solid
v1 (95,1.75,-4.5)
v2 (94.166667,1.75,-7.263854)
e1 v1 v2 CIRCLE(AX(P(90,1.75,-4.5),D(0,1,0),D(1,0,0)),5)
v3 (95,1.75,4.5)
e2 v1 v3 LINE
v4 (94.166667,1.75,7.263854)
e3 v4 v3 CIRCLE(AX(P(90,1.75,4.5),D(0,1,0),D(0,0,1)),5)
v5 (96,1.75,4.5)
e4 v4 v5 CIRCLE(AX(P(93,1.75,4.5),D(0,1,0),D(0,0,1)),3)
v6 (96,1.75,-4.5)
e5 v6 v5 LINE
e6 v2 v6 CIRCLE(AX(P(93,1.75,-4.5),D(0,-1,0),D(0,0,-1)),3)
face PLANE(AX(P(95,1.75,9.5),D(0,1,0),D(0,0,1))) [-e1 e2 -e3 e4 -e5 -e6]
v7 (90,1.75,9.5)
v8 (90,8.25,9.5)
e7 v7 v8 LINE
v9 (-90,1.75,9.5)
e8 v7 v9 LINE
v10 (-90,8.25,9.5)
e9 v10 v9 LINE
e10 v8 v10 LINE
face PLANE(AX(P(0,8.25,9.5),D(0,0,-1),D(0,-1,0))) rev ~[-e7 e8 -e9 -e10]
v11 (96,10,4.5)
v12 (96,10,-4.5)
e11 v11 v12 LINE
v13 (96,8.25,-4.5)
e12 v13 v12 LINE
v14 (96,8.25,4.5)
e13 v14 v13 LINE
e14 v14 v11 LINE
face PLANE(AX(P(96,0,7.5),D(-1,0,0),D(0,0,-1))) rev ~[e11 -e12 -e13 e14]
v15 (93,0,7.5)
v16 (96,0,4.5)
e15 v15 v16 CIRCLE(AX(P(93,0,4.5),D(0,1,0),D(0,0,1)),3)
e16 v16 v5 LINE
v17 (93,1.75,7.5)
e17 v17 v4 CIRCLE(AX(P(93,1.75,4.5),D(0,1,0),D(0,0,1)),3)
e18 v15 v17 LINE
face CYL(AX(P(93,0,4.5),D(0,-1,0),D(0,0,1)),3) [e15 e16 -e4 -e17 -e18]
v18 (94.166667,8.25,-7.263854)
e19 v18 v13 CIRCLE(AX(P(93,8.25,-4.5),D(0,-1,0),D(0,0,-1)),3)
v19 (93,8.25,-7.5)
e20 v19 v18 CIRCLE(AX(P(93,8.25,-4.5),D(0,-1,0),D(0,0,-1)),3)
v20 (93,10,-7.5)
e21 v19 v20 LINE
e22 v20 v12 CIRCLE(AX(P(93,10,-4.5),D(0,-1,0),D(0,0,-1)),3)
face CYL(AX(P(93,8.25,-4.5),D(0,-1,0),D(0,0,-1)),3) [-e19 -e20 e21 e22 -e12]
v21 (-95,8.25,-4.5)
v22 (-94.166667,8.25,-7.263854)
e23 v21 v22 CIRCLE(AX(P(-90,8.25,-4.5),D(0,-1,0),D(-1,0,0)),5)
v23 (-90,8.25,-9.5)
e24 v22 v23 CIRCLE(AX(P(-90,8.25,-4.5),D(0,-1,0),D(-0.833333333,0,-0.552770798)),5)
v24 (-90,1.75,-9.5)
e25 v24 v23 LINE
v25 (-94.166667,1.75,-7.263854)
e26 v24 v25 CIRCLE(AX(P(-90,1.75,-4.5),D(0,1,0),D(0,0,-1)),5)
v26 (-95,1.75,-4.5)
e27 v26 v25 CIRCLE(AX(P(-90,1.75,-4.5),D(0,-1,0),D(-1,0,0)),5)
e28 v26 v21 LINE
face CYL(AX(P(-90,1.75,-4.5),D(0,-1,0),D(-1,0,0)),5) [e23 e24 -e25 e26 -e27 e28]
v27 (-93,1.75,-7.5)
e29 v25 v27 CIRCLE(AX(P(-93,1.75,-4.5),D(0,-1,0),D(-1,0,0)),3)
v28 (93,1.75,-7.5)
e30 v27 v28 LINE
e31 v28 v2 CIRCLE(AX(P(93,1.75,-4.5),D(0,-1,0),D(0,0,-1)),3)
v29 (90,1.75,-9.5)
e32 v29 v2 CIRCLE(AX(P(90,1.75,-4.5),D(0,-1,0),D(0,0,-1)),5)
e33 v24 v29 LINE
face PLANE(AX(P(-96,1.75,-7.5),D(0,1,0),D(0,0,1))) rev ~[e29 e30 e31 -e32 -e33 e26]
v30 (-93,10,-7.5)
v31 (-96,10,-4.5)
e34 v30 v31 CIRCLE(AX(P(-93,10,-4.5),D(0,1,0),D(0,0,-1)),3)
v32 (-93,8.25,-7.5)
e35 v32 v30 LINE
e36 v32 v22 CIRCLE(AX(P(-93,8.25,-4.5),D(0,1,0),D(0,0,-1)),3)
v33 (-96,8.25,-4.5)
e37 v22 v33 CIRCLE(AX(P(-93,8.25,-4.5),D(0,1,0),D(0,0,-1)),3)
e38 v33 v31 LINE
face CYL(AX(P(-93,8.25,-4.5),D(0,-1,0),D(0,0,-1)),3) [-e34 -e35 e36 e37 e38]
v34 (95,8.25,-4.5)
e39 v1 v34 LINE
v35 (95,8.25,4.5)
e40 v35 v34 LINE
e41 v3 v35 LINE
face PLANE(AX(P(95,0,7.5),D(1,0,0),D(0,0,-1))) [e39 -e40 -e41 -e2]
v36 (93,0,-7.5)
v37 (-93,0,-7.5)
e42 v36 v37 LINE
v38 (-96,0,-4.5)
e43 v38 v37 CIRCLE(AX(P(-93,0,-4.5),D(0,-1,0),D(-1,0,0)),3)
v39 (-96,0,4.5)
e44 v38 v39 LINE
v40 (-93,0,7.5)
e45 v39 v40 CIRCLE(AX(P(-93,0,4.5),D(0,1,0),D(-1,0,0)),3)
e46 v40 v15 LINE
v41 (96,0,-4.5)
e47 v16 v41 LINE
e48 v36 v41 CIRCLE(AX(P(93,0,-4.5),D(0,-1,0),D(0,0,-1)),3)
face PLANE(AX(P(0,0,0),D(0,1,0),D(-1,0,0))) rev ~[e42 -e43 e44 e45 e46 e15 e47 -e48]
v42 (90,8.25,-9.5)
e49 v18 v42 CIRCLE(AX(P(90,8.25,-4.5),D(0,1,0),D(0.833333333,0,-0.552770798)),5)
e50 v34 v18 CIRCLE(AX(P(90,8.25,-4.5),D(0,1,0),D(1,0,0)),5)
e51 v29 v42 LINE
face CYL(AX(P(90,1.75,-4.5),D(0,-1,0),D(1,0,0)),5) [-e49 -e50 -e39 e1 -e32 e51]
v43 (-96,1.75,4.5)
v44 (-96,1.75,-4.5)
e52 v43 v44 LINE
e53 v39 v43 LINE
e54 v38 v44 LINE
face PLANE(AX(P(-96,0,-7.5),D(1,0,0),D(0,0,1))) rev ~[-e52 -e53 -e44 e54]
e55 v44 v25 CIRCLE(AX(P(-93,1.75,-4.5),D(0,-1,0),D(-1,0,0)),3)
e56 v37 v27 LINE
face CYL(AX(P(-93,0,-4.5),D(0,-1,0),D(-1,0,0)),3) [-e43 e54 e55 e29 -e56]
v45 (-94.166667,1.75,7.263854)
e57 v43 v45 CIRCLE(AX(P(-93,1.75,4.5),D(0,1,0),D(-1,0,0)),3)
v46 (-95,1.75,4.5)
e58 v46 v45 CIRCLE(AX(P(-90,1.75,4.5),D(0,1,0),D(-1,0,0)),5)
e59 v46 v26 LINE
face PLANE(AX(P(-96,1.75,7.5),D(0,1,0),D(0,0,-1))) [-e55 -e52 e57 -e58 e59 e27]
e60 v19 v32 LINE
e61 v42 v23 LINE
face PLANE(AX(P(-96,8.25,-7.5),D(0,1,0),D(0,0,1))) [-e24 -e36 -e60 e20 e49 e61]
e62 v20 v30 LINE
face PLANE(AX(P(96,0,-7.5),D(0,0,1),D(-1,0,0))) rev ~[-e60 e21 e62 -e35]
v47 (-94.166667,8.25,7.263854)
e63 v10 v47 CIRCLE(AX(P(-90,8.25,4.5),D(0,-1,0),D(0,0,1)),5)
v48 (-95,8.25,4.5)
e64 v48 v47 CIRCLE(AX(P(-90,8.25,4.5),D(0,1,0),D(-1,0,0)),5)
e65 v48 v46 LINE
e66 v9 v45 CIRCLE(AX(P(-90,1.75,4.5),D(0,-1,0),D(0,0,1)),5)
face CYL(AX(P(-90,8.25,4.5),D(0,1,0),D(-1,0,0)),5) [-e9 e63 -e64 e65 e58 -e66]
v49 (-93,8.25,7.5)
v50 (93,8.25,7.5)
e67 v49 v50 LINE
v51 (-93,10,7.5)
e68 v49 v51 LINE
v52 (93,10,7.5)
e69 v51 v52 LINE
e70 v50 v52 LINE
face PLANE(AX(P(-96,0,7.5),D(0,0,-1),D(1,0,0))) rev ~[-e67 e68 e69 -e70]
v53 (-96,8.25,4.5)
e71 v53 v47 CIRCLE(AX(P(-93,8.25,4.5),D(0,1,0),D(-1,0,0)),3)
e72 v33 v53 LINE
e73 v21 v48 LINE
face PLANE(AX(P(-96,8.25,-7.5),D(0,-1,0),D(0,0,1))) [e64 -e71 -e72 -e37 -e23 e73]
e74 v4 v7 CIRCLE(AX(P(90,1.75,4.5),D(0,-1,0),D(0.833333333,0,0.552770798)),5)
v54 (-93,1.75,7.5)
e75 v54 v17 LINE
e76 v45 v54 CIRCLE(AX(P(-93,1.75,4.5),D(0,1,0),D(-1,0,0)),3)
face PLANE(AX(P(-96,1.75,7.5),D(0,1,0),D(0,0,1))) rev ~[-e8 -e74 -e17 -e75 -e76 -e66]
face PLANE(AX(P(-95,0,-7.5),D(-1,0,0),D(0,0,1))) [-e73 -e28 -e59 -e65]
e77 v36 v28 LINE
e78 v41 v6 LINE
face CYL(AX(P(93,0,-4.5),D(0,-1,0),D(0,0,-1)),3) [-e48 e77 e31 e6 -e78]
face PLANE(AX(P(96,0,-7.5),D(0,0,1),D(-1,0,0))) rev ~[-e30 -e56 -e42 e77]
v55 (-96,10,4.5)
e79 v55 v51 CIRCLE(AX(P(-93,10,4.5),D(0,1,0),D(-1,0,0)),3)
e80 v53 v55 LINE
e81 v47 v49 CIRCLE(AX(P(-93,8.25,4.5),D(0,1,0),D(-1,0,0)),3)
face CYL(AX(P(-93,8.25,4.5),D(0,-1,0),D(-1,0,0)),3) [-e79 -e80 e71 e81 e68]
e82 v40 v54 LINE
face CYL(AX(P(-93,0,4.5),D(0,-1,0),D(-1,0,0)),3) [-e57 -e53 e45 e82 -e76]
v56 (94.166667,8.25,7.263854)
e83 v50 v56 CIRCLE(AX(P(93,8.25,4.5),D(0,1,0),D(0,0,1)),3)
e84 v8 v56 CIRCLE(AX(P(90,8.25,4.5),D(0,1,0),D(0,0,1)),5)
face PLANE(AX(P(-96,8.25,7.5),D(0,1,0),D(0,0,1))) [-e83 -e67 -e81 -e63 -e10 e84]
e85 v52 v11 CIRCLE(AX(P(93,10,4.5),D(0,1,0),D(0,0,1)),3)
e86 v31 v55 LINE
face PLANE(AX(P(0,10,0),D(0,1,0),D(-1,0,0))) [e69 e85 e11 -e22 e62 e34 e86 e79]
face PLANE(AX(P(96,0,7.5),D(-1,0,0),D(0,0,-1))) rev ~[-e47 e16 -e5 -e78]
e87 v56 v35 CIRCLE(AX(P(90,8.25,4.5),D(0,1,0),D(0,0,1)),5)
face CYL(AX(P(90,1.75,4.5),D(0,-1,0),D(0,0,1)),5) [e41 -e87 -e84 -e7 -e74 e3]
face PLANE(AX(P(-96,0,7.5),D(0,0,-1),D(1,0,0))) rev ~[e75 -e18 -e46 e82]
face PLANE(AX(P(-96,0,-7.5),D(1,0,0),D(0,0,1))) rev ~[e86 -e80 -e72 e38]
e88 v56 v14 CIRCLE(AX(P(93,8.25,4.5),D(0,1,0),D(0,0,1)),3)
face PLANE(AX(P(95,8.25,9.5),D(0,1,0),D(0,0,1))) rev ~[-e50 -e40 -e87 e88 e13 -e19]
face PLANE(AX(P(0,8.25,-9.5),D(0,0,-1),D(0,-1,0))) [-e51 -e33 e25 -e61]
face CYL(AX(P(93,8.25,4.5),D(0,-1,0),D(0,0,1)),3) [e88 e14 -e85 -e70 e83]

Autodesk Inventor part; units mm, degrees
ref_plane "YZ Plane" through (0, 0, 0) normal (1, 0, 0) x (0, 1, 0)
ref_plane "XZ Plane" through (0, 0, 0) normal (0, 1, 0) x (-1, 0, 0)
ref_plane "XY Plane" through (0, 0, 0) normal (0, 0, 1) x (1, 0, 0)
sketch "Boceto1" plane through (0, 0, 0) normal (0, 1, 0) x (-1, 0, 0)
  line L0 (96, 7.5) -> (-96, 7.5)
  line L1 (-96, 7.5) -> (-96, -7.5)
  line L2 (-96, -7.5) -> (96, -7.5)
  line L3 (96, -7.5) -> (96, 7.5)
  line L4 (96, 7.5) -> (-96, -7.5) construction
  line L5 (-96, 7.5) -> (96, -7.5) construction
  point P0 (0, 0)
  dimension "d0" = 192
  dimension "d1" = 15
extrude "Extrusión1" add sketch "Boceto1" along normal blind 10
sketch "Boceto2" plane through (0, 0, 0) normal (1, 0, 0) x (0, 1, 0)
  line L0 (0, 7.5) -> (10, 7.5) projected
  line L1 (1.75, 7.5) -> (8.25, 7.5)
  line L2 (8.25, 7.5) -> (8.25, 9.5)
  line L3 (8.25, 9.5) -> (1.75, 9.5)
  line L4 (1.75, 9.5) -> (1.75, 7.5)
  line L5 (0, -7.5) -> (0, 7.5) projected
  line L6 (0, -7.5) -> (10, -7.5) projected
  line L7 (1.75, -7.5) -> (8.25, -7.5)
  line L8 (8.25, -7.5) -> (8.25, -9.5)
  line L9 (8.25, -9.5) -> (1.75, -9.5)
  line L10 (1.75, -9.5) -> (1.75, -7.5)
  point P0 (0, 0)
  dimension "d4" = 6.5
  dimension "d5" = 1.75
  dimension "d6" = 2
extrude "Extrusión2" add sketch "Boceto2" along normal mid plane 192
sketch "Boceto4" plane through (-96, 0, -7.5) normal (-1, 0, 0) x (0, 0, 1)
  line L0 (15, 1.75) -> (17, 1.75) projected
  line L1 (0, 8.25) -> (-2, 8.25) projected
  line L2 (17, 1.75) -> (-2, 1.75)
  line L3 (-2, 1.75) -> (-2, 8.25)
  line L4 (-2, 8.25) -> (17, 8.25)
  line L5 (17, 8.25) -> (17, 1.75)
  point P0 (7.5, 0)
  point P1 (15, 1.75)
  point P2 (0, 8.25)
extrude "Extrusión3" cut sketch "Boceto4" against normal blind 1
sketch "Boceto5" plane through (96, 0, 7.5) normal (1, 0, 0) x (0, 0, -1)
  line L0 (0, 8.25) -> (-2, 8.25) projected
  line L1 (17, 1.75) -> (17, 8.25) projected
  line L2 (-2, 8.25) -> (17, 8.25)
  line L3 (17, 8.25) -> (17, 1.75)
  line L4 (17, 1.75) -> (-2, 1.75)
  line L5 (-2, 1.75) -> (-2, 8.25)
  point P0 (7.5, 0)
  point P1 (17, 8.25)
  point P2 (0, 8.25)
extrude "Extrusión4" cut sketch "Boceto5" against normal blind 1
fillet "Empalme1" radius 5 4 edges at (95, 5, -9.5) (95, 5, 9.5) (-95, 5, -9.5) (-95, 5, 9.5)
fillet "Empalme2" radius 3 8 edges at (96, 9.125, 7.5) (96, 0.875, 7.5) (96, 9.125, -7.5) (96, 0.875, -7.5) (-96, 0.875, 7.5) (-96, 9.125, 7.5) (-96, 0.875, -7.5) (-96, 9.125, -7.5)
properties part number "GT2Rack"
